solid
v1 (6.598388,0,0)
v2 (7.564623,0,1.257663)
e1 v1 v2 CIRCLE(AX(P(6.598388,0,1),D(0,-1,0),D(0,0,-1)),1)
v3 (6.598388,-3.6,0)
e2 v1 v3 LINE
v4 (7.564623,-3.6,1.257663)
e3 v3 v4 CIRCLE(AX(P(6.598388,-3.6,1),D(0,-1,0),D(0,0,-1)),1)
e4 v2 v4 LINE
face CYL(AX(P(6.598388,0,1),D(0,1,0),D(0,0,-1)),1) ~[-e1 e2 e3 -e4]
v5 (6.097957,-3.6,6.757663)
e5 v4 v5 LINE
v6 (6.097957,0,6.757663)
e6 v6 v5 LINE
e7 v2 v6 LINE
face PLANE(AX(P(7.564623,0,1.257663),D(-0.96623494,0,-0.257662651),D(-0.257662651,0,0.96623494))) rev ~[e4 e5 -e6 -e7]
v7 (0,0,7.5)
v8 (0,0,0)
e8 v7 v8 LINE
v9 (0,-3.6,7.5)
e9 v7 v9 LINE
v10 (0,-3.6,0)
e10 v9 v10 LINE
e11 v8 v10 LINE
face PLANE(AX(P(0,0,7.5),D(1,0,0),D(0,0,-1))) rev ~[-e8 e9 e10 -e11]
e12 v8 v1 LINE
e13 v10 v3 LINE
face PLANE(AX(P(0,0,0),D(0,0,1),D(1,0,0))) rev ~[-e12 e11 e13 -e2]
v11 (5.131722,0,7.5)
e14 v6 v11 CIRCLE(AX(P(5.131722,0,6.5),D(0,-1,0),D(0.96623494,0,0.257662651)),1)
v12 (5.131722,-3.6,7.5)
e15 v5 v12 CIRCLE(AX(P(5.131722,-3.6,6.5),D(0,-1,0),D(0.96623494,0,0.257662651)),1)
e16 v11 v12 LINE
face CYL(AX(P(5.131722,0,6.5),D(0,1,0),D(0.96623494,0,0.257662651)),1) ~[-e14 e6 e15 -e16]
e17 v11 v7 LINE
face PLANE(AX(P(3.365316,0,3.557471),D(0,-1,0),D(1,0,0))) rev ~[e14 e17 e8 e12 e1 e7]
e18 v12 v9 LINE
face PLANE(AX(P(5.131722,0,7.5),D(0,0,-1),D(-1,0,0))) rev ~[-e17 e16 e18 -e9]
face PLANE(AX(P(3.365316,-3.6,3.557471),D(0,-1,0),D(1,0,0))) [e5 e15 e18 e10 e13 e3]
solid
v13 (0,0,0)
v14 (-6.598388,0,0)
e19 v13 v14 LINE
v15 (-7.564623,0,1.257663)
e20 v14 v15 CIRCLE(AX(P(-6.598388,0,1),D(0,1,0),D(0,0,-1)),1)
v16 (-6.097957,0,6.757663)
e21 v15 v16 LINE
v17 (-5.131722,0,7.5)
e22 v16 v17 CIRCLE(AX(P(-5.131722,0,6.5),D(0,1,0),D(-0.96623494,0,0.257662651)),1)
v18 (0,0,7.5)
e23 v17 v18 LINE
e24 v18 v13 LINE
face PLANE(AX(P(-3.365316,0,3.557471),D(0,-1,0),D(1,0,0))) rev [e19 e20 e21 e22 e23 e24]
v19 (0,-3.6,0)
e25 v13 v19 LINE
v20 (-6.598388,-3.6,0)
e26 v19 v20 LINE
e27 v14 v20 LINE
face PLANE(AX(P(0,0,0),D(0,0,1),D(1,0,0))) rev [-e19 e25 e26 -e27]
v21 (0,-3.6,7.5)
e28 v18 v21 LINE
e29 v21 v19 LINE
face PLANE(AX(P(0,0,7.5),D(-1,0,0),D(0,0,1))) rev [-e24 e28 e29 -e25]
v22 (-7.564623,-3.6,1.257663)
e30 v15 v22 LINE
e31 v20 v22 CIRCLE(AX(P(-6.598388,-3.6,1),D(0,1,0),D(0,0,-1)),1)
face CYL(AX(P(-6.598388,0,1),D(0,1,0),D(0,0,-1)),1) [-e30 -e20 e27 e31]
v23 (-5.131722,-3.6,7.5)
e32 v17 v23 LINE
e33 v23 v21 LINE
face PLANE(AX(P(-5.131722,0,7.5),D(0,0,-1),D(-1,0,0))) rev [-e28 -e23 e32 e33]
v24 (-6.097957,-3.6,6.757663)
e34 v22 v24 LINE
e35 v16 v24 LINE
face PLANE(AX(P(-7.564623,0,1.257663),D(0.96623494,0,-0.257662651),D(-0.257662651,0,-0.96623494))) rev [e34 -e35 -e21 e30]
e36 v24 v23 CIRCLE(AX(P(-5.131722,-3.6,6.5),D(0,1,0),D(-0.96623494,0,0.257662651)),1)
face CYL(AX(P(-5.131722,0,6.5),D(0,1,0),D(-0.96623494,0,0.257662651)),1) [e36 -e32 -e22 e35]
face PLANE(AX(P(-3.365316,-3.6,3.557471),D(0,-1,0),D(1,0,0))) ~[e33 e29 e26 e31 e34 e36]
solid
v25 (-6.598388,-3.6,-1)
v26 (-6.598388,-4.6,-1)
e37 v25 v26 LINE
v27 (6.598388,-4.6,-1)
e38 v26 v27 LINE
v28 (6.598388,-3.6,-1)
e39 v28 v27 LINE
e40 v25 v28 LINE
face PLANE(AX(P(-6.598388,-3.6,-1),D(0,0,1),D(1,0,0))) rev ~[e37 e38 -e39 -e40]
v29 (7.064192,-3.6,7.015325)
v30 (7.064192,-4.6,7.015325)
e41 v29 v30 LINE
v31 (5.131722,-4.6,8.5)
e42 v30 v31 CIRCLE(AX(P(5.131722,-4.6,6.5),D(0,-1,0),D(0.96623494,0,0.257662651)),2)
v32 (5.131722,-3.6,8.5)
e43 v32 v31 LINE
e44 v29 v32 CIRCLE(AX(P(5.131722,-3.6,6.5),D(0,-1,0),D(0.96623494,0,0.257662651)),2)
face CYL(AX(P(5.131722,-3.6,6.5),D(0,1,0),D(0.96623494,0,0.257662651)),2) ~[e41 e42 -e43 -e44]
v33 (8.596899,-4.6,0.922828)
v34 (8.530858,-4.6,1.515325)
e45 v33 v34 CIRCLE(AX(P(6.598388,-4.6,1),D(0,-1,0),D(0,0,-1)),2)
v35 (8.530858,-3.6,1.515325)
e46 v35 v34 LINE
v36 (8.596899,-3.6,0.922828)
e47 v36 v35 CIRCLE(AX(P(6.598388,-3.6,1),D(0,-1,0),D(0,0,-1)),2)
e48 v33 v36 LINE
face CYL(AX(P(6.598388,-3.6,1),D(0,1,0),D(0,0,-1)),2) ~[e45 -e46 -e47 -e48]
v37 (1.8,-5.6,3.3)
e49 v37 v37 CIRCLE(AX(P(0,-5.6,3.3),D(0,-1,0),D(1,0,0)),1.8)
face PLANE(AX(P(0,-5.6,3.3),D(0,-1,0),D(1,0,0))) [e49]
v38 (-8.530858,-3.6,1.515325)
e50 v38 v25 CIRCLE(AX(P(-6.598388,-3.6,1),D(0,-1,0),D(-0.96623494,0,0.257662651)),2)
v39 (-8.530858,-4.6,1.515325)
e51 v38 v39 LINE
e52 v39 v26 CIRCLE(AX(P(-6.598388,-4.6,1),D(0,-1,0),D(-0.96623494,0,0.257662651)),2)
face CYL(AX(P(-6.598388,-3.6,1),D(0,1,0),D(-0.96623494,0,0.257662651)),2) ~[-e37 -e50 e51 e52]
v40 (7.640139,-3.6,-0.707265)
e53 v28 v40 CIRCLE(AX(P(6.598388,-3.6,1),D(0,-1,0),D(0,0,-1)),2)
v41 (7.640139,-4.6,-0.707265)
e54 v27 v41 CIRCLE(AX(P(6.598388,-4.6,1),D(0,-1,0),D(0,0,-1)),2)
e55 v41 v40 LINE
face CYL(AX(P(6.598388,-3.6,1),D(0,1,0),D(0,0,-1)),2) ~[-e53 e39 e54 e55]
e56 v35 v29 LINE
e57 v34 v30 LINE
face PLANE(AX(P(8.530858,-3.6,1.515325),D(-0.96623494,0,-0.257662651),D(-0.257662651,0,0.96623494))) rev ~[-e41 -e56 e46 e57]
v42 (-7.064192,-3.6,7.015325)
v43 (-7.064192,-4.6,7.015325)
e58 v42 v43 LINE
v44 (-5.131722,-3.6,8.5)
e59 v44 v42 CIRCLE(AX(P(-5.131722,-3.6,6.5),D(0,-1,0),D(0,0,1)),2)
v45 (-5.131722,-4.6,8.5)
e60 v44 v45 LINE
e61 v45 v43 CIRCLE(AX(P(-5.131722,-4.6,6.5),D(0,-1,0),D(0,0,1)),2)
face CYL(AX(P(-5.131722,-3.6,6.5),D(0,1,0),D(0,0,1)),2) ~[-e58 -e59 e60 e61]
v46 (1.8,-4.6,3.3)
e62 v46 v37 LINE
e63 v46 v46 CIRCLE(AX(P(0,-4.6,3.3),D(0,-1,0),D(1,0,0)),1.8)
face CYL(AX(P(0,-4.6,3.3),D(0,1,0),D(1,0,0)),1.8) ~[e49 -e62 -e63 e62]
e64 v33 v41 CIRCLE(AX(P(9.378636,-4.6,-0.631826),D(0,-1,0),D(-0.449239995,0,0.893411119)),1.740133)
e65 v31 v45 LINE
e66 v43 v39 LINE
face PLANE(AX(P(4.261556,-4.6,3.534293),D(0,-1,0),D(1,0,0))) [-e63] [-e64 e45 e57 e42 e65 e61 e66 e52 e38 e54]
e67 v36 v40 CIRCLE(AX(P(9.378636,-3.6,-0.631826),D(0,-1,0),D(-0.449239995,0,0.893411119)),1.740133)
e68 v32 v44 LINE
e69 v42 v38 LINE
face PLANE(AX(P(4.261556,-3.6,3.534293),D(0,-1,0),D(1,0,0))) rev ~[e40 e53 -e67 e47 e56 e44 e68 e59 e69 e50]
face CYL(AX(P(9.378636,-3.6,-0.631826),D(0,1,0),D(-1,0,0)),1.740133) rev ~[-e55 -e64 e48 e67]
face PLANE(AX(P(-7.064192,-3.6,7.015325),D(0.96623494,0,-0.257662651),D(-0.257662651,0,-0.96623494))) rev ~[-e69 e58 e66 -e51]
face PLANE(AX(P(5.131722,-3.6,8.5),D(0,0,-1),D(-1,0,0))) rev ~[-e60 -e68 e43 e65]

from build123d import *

# Parameters (mm, degrees)
F1_DEPTH = 3.6
F2_W     = 2
F2_H     = 9.5
F3_DEPTH = 1
F4_R     = 1.7401329742
F5_DEPTH = 25
F6_R     = 1.8
F7_DEPTH = 1


# Not quite as in the source:
# - a pattern or mirror of a feature is missing from the dataset's text; its kind, count and spacing are read off the source's solid
# - a feature names something its author has since deleted; it is built from what else it names


with BuildPart() as f1:
    # F0 (on Front) → F1 (new body)
    with BuildSketch(Plane.XZ):
        with BuildLine():
            Line((0, 7.5), (0, 0))
            Line((0, 0), (6.5983883536, 0))
            ThreePointArc((6.5983883536, 0), (7.3913772093, 0.3907638596), (7.5646232932, 1.2576626506))
            Line((7.5646232932, 1.2576626506), (6.0979566265, 6.7576626506))
            ThreePointArc((6.0979566265, 6.7576626506), (5.7409578273, 7.2929888557), (5.1317216869, 7.5))
            Line((5.1317216869, 7.5), (0, 7.5))
        make_face()
    extrude(amount=F1_DEPTH)


with BuildPart() as f1_copies_1:
    # F1_copies: instance of F1
    add(f1.part.mirror(Plane(origin=(0, 0, 0), x_dir=(0, 0, -1), z_dir=(-1, 0, 0))))


with BuildPart() as f3:
    # F2 (on face) → F3 (new body)
    with BuildSketch(Plane.XZ.offset(3.6)):
        with BuildLine():
            Line((1, -1), (6.5983883536, -1))
            ThreePointArc((6.5983883536, -1), (8.184366065, -0.2184722807), (8.5308582328, 1.5153253011))
            Line((8.5308582328, 1.5153253011), (7.0641915661, 7.0153253011))
            ThreePointArc((7.0641915661, 7.0153253011), (6.3501939676, 8.0859777114), (5.1317216869, 8.5))
            Line((5.1317216869, 8.5), (1, 8.5))
            Line((1, 8.5), (1, -1))
        make_face()
        with Locations((0, 3.75)):
            Rectangle(F2_W, F2_H)
        with BuildLine():
            Line((-6.5983883536, -1), (-1, -1))
            Line((-1, -1), (-1, 8.5))
            Line((-1, 8.5), (-5.1317216869, 8.5))
            ThreePointArc((-5.1317216869, 8.5), (-6.3501939676, 8.0859777114), (-7.0641915661, 7.0153253011))
            Line((-7.0641915661, 7.0153253011), (-8.5308582328, 1.5153253011))
            ThreePointArc((-8.5308582328, 1.5153253011), (-8.184366065, -0.2184722807), (-6.5983883536, -1))
        make_face()
    extrude(amount=F3_DEPTH)

    # F4 (on face) → F5 (cut)
    with BuildSketch(Plane(origin=(0, -3.6, 0), x_dir=(-1, 0, 0), z_dir=(0, 1, 0))):
        with Locations((-9.3786362559, -0.6318259402)):
            Circle(F4_R)
    extrude(amount=-F5_DEPTH, mode=Mode.SUBTRACT)

    # F6 (on face) → F7 (join)
    with BuildSketch(Plane.XZ.offset(4.6)):
        with Locations((0, 3.3)):
            Circle(F6_R)
    extrude(amount=F7_DEPTH)


solid = Compound([f1.part, f1_copies_1.part, f3.part])
